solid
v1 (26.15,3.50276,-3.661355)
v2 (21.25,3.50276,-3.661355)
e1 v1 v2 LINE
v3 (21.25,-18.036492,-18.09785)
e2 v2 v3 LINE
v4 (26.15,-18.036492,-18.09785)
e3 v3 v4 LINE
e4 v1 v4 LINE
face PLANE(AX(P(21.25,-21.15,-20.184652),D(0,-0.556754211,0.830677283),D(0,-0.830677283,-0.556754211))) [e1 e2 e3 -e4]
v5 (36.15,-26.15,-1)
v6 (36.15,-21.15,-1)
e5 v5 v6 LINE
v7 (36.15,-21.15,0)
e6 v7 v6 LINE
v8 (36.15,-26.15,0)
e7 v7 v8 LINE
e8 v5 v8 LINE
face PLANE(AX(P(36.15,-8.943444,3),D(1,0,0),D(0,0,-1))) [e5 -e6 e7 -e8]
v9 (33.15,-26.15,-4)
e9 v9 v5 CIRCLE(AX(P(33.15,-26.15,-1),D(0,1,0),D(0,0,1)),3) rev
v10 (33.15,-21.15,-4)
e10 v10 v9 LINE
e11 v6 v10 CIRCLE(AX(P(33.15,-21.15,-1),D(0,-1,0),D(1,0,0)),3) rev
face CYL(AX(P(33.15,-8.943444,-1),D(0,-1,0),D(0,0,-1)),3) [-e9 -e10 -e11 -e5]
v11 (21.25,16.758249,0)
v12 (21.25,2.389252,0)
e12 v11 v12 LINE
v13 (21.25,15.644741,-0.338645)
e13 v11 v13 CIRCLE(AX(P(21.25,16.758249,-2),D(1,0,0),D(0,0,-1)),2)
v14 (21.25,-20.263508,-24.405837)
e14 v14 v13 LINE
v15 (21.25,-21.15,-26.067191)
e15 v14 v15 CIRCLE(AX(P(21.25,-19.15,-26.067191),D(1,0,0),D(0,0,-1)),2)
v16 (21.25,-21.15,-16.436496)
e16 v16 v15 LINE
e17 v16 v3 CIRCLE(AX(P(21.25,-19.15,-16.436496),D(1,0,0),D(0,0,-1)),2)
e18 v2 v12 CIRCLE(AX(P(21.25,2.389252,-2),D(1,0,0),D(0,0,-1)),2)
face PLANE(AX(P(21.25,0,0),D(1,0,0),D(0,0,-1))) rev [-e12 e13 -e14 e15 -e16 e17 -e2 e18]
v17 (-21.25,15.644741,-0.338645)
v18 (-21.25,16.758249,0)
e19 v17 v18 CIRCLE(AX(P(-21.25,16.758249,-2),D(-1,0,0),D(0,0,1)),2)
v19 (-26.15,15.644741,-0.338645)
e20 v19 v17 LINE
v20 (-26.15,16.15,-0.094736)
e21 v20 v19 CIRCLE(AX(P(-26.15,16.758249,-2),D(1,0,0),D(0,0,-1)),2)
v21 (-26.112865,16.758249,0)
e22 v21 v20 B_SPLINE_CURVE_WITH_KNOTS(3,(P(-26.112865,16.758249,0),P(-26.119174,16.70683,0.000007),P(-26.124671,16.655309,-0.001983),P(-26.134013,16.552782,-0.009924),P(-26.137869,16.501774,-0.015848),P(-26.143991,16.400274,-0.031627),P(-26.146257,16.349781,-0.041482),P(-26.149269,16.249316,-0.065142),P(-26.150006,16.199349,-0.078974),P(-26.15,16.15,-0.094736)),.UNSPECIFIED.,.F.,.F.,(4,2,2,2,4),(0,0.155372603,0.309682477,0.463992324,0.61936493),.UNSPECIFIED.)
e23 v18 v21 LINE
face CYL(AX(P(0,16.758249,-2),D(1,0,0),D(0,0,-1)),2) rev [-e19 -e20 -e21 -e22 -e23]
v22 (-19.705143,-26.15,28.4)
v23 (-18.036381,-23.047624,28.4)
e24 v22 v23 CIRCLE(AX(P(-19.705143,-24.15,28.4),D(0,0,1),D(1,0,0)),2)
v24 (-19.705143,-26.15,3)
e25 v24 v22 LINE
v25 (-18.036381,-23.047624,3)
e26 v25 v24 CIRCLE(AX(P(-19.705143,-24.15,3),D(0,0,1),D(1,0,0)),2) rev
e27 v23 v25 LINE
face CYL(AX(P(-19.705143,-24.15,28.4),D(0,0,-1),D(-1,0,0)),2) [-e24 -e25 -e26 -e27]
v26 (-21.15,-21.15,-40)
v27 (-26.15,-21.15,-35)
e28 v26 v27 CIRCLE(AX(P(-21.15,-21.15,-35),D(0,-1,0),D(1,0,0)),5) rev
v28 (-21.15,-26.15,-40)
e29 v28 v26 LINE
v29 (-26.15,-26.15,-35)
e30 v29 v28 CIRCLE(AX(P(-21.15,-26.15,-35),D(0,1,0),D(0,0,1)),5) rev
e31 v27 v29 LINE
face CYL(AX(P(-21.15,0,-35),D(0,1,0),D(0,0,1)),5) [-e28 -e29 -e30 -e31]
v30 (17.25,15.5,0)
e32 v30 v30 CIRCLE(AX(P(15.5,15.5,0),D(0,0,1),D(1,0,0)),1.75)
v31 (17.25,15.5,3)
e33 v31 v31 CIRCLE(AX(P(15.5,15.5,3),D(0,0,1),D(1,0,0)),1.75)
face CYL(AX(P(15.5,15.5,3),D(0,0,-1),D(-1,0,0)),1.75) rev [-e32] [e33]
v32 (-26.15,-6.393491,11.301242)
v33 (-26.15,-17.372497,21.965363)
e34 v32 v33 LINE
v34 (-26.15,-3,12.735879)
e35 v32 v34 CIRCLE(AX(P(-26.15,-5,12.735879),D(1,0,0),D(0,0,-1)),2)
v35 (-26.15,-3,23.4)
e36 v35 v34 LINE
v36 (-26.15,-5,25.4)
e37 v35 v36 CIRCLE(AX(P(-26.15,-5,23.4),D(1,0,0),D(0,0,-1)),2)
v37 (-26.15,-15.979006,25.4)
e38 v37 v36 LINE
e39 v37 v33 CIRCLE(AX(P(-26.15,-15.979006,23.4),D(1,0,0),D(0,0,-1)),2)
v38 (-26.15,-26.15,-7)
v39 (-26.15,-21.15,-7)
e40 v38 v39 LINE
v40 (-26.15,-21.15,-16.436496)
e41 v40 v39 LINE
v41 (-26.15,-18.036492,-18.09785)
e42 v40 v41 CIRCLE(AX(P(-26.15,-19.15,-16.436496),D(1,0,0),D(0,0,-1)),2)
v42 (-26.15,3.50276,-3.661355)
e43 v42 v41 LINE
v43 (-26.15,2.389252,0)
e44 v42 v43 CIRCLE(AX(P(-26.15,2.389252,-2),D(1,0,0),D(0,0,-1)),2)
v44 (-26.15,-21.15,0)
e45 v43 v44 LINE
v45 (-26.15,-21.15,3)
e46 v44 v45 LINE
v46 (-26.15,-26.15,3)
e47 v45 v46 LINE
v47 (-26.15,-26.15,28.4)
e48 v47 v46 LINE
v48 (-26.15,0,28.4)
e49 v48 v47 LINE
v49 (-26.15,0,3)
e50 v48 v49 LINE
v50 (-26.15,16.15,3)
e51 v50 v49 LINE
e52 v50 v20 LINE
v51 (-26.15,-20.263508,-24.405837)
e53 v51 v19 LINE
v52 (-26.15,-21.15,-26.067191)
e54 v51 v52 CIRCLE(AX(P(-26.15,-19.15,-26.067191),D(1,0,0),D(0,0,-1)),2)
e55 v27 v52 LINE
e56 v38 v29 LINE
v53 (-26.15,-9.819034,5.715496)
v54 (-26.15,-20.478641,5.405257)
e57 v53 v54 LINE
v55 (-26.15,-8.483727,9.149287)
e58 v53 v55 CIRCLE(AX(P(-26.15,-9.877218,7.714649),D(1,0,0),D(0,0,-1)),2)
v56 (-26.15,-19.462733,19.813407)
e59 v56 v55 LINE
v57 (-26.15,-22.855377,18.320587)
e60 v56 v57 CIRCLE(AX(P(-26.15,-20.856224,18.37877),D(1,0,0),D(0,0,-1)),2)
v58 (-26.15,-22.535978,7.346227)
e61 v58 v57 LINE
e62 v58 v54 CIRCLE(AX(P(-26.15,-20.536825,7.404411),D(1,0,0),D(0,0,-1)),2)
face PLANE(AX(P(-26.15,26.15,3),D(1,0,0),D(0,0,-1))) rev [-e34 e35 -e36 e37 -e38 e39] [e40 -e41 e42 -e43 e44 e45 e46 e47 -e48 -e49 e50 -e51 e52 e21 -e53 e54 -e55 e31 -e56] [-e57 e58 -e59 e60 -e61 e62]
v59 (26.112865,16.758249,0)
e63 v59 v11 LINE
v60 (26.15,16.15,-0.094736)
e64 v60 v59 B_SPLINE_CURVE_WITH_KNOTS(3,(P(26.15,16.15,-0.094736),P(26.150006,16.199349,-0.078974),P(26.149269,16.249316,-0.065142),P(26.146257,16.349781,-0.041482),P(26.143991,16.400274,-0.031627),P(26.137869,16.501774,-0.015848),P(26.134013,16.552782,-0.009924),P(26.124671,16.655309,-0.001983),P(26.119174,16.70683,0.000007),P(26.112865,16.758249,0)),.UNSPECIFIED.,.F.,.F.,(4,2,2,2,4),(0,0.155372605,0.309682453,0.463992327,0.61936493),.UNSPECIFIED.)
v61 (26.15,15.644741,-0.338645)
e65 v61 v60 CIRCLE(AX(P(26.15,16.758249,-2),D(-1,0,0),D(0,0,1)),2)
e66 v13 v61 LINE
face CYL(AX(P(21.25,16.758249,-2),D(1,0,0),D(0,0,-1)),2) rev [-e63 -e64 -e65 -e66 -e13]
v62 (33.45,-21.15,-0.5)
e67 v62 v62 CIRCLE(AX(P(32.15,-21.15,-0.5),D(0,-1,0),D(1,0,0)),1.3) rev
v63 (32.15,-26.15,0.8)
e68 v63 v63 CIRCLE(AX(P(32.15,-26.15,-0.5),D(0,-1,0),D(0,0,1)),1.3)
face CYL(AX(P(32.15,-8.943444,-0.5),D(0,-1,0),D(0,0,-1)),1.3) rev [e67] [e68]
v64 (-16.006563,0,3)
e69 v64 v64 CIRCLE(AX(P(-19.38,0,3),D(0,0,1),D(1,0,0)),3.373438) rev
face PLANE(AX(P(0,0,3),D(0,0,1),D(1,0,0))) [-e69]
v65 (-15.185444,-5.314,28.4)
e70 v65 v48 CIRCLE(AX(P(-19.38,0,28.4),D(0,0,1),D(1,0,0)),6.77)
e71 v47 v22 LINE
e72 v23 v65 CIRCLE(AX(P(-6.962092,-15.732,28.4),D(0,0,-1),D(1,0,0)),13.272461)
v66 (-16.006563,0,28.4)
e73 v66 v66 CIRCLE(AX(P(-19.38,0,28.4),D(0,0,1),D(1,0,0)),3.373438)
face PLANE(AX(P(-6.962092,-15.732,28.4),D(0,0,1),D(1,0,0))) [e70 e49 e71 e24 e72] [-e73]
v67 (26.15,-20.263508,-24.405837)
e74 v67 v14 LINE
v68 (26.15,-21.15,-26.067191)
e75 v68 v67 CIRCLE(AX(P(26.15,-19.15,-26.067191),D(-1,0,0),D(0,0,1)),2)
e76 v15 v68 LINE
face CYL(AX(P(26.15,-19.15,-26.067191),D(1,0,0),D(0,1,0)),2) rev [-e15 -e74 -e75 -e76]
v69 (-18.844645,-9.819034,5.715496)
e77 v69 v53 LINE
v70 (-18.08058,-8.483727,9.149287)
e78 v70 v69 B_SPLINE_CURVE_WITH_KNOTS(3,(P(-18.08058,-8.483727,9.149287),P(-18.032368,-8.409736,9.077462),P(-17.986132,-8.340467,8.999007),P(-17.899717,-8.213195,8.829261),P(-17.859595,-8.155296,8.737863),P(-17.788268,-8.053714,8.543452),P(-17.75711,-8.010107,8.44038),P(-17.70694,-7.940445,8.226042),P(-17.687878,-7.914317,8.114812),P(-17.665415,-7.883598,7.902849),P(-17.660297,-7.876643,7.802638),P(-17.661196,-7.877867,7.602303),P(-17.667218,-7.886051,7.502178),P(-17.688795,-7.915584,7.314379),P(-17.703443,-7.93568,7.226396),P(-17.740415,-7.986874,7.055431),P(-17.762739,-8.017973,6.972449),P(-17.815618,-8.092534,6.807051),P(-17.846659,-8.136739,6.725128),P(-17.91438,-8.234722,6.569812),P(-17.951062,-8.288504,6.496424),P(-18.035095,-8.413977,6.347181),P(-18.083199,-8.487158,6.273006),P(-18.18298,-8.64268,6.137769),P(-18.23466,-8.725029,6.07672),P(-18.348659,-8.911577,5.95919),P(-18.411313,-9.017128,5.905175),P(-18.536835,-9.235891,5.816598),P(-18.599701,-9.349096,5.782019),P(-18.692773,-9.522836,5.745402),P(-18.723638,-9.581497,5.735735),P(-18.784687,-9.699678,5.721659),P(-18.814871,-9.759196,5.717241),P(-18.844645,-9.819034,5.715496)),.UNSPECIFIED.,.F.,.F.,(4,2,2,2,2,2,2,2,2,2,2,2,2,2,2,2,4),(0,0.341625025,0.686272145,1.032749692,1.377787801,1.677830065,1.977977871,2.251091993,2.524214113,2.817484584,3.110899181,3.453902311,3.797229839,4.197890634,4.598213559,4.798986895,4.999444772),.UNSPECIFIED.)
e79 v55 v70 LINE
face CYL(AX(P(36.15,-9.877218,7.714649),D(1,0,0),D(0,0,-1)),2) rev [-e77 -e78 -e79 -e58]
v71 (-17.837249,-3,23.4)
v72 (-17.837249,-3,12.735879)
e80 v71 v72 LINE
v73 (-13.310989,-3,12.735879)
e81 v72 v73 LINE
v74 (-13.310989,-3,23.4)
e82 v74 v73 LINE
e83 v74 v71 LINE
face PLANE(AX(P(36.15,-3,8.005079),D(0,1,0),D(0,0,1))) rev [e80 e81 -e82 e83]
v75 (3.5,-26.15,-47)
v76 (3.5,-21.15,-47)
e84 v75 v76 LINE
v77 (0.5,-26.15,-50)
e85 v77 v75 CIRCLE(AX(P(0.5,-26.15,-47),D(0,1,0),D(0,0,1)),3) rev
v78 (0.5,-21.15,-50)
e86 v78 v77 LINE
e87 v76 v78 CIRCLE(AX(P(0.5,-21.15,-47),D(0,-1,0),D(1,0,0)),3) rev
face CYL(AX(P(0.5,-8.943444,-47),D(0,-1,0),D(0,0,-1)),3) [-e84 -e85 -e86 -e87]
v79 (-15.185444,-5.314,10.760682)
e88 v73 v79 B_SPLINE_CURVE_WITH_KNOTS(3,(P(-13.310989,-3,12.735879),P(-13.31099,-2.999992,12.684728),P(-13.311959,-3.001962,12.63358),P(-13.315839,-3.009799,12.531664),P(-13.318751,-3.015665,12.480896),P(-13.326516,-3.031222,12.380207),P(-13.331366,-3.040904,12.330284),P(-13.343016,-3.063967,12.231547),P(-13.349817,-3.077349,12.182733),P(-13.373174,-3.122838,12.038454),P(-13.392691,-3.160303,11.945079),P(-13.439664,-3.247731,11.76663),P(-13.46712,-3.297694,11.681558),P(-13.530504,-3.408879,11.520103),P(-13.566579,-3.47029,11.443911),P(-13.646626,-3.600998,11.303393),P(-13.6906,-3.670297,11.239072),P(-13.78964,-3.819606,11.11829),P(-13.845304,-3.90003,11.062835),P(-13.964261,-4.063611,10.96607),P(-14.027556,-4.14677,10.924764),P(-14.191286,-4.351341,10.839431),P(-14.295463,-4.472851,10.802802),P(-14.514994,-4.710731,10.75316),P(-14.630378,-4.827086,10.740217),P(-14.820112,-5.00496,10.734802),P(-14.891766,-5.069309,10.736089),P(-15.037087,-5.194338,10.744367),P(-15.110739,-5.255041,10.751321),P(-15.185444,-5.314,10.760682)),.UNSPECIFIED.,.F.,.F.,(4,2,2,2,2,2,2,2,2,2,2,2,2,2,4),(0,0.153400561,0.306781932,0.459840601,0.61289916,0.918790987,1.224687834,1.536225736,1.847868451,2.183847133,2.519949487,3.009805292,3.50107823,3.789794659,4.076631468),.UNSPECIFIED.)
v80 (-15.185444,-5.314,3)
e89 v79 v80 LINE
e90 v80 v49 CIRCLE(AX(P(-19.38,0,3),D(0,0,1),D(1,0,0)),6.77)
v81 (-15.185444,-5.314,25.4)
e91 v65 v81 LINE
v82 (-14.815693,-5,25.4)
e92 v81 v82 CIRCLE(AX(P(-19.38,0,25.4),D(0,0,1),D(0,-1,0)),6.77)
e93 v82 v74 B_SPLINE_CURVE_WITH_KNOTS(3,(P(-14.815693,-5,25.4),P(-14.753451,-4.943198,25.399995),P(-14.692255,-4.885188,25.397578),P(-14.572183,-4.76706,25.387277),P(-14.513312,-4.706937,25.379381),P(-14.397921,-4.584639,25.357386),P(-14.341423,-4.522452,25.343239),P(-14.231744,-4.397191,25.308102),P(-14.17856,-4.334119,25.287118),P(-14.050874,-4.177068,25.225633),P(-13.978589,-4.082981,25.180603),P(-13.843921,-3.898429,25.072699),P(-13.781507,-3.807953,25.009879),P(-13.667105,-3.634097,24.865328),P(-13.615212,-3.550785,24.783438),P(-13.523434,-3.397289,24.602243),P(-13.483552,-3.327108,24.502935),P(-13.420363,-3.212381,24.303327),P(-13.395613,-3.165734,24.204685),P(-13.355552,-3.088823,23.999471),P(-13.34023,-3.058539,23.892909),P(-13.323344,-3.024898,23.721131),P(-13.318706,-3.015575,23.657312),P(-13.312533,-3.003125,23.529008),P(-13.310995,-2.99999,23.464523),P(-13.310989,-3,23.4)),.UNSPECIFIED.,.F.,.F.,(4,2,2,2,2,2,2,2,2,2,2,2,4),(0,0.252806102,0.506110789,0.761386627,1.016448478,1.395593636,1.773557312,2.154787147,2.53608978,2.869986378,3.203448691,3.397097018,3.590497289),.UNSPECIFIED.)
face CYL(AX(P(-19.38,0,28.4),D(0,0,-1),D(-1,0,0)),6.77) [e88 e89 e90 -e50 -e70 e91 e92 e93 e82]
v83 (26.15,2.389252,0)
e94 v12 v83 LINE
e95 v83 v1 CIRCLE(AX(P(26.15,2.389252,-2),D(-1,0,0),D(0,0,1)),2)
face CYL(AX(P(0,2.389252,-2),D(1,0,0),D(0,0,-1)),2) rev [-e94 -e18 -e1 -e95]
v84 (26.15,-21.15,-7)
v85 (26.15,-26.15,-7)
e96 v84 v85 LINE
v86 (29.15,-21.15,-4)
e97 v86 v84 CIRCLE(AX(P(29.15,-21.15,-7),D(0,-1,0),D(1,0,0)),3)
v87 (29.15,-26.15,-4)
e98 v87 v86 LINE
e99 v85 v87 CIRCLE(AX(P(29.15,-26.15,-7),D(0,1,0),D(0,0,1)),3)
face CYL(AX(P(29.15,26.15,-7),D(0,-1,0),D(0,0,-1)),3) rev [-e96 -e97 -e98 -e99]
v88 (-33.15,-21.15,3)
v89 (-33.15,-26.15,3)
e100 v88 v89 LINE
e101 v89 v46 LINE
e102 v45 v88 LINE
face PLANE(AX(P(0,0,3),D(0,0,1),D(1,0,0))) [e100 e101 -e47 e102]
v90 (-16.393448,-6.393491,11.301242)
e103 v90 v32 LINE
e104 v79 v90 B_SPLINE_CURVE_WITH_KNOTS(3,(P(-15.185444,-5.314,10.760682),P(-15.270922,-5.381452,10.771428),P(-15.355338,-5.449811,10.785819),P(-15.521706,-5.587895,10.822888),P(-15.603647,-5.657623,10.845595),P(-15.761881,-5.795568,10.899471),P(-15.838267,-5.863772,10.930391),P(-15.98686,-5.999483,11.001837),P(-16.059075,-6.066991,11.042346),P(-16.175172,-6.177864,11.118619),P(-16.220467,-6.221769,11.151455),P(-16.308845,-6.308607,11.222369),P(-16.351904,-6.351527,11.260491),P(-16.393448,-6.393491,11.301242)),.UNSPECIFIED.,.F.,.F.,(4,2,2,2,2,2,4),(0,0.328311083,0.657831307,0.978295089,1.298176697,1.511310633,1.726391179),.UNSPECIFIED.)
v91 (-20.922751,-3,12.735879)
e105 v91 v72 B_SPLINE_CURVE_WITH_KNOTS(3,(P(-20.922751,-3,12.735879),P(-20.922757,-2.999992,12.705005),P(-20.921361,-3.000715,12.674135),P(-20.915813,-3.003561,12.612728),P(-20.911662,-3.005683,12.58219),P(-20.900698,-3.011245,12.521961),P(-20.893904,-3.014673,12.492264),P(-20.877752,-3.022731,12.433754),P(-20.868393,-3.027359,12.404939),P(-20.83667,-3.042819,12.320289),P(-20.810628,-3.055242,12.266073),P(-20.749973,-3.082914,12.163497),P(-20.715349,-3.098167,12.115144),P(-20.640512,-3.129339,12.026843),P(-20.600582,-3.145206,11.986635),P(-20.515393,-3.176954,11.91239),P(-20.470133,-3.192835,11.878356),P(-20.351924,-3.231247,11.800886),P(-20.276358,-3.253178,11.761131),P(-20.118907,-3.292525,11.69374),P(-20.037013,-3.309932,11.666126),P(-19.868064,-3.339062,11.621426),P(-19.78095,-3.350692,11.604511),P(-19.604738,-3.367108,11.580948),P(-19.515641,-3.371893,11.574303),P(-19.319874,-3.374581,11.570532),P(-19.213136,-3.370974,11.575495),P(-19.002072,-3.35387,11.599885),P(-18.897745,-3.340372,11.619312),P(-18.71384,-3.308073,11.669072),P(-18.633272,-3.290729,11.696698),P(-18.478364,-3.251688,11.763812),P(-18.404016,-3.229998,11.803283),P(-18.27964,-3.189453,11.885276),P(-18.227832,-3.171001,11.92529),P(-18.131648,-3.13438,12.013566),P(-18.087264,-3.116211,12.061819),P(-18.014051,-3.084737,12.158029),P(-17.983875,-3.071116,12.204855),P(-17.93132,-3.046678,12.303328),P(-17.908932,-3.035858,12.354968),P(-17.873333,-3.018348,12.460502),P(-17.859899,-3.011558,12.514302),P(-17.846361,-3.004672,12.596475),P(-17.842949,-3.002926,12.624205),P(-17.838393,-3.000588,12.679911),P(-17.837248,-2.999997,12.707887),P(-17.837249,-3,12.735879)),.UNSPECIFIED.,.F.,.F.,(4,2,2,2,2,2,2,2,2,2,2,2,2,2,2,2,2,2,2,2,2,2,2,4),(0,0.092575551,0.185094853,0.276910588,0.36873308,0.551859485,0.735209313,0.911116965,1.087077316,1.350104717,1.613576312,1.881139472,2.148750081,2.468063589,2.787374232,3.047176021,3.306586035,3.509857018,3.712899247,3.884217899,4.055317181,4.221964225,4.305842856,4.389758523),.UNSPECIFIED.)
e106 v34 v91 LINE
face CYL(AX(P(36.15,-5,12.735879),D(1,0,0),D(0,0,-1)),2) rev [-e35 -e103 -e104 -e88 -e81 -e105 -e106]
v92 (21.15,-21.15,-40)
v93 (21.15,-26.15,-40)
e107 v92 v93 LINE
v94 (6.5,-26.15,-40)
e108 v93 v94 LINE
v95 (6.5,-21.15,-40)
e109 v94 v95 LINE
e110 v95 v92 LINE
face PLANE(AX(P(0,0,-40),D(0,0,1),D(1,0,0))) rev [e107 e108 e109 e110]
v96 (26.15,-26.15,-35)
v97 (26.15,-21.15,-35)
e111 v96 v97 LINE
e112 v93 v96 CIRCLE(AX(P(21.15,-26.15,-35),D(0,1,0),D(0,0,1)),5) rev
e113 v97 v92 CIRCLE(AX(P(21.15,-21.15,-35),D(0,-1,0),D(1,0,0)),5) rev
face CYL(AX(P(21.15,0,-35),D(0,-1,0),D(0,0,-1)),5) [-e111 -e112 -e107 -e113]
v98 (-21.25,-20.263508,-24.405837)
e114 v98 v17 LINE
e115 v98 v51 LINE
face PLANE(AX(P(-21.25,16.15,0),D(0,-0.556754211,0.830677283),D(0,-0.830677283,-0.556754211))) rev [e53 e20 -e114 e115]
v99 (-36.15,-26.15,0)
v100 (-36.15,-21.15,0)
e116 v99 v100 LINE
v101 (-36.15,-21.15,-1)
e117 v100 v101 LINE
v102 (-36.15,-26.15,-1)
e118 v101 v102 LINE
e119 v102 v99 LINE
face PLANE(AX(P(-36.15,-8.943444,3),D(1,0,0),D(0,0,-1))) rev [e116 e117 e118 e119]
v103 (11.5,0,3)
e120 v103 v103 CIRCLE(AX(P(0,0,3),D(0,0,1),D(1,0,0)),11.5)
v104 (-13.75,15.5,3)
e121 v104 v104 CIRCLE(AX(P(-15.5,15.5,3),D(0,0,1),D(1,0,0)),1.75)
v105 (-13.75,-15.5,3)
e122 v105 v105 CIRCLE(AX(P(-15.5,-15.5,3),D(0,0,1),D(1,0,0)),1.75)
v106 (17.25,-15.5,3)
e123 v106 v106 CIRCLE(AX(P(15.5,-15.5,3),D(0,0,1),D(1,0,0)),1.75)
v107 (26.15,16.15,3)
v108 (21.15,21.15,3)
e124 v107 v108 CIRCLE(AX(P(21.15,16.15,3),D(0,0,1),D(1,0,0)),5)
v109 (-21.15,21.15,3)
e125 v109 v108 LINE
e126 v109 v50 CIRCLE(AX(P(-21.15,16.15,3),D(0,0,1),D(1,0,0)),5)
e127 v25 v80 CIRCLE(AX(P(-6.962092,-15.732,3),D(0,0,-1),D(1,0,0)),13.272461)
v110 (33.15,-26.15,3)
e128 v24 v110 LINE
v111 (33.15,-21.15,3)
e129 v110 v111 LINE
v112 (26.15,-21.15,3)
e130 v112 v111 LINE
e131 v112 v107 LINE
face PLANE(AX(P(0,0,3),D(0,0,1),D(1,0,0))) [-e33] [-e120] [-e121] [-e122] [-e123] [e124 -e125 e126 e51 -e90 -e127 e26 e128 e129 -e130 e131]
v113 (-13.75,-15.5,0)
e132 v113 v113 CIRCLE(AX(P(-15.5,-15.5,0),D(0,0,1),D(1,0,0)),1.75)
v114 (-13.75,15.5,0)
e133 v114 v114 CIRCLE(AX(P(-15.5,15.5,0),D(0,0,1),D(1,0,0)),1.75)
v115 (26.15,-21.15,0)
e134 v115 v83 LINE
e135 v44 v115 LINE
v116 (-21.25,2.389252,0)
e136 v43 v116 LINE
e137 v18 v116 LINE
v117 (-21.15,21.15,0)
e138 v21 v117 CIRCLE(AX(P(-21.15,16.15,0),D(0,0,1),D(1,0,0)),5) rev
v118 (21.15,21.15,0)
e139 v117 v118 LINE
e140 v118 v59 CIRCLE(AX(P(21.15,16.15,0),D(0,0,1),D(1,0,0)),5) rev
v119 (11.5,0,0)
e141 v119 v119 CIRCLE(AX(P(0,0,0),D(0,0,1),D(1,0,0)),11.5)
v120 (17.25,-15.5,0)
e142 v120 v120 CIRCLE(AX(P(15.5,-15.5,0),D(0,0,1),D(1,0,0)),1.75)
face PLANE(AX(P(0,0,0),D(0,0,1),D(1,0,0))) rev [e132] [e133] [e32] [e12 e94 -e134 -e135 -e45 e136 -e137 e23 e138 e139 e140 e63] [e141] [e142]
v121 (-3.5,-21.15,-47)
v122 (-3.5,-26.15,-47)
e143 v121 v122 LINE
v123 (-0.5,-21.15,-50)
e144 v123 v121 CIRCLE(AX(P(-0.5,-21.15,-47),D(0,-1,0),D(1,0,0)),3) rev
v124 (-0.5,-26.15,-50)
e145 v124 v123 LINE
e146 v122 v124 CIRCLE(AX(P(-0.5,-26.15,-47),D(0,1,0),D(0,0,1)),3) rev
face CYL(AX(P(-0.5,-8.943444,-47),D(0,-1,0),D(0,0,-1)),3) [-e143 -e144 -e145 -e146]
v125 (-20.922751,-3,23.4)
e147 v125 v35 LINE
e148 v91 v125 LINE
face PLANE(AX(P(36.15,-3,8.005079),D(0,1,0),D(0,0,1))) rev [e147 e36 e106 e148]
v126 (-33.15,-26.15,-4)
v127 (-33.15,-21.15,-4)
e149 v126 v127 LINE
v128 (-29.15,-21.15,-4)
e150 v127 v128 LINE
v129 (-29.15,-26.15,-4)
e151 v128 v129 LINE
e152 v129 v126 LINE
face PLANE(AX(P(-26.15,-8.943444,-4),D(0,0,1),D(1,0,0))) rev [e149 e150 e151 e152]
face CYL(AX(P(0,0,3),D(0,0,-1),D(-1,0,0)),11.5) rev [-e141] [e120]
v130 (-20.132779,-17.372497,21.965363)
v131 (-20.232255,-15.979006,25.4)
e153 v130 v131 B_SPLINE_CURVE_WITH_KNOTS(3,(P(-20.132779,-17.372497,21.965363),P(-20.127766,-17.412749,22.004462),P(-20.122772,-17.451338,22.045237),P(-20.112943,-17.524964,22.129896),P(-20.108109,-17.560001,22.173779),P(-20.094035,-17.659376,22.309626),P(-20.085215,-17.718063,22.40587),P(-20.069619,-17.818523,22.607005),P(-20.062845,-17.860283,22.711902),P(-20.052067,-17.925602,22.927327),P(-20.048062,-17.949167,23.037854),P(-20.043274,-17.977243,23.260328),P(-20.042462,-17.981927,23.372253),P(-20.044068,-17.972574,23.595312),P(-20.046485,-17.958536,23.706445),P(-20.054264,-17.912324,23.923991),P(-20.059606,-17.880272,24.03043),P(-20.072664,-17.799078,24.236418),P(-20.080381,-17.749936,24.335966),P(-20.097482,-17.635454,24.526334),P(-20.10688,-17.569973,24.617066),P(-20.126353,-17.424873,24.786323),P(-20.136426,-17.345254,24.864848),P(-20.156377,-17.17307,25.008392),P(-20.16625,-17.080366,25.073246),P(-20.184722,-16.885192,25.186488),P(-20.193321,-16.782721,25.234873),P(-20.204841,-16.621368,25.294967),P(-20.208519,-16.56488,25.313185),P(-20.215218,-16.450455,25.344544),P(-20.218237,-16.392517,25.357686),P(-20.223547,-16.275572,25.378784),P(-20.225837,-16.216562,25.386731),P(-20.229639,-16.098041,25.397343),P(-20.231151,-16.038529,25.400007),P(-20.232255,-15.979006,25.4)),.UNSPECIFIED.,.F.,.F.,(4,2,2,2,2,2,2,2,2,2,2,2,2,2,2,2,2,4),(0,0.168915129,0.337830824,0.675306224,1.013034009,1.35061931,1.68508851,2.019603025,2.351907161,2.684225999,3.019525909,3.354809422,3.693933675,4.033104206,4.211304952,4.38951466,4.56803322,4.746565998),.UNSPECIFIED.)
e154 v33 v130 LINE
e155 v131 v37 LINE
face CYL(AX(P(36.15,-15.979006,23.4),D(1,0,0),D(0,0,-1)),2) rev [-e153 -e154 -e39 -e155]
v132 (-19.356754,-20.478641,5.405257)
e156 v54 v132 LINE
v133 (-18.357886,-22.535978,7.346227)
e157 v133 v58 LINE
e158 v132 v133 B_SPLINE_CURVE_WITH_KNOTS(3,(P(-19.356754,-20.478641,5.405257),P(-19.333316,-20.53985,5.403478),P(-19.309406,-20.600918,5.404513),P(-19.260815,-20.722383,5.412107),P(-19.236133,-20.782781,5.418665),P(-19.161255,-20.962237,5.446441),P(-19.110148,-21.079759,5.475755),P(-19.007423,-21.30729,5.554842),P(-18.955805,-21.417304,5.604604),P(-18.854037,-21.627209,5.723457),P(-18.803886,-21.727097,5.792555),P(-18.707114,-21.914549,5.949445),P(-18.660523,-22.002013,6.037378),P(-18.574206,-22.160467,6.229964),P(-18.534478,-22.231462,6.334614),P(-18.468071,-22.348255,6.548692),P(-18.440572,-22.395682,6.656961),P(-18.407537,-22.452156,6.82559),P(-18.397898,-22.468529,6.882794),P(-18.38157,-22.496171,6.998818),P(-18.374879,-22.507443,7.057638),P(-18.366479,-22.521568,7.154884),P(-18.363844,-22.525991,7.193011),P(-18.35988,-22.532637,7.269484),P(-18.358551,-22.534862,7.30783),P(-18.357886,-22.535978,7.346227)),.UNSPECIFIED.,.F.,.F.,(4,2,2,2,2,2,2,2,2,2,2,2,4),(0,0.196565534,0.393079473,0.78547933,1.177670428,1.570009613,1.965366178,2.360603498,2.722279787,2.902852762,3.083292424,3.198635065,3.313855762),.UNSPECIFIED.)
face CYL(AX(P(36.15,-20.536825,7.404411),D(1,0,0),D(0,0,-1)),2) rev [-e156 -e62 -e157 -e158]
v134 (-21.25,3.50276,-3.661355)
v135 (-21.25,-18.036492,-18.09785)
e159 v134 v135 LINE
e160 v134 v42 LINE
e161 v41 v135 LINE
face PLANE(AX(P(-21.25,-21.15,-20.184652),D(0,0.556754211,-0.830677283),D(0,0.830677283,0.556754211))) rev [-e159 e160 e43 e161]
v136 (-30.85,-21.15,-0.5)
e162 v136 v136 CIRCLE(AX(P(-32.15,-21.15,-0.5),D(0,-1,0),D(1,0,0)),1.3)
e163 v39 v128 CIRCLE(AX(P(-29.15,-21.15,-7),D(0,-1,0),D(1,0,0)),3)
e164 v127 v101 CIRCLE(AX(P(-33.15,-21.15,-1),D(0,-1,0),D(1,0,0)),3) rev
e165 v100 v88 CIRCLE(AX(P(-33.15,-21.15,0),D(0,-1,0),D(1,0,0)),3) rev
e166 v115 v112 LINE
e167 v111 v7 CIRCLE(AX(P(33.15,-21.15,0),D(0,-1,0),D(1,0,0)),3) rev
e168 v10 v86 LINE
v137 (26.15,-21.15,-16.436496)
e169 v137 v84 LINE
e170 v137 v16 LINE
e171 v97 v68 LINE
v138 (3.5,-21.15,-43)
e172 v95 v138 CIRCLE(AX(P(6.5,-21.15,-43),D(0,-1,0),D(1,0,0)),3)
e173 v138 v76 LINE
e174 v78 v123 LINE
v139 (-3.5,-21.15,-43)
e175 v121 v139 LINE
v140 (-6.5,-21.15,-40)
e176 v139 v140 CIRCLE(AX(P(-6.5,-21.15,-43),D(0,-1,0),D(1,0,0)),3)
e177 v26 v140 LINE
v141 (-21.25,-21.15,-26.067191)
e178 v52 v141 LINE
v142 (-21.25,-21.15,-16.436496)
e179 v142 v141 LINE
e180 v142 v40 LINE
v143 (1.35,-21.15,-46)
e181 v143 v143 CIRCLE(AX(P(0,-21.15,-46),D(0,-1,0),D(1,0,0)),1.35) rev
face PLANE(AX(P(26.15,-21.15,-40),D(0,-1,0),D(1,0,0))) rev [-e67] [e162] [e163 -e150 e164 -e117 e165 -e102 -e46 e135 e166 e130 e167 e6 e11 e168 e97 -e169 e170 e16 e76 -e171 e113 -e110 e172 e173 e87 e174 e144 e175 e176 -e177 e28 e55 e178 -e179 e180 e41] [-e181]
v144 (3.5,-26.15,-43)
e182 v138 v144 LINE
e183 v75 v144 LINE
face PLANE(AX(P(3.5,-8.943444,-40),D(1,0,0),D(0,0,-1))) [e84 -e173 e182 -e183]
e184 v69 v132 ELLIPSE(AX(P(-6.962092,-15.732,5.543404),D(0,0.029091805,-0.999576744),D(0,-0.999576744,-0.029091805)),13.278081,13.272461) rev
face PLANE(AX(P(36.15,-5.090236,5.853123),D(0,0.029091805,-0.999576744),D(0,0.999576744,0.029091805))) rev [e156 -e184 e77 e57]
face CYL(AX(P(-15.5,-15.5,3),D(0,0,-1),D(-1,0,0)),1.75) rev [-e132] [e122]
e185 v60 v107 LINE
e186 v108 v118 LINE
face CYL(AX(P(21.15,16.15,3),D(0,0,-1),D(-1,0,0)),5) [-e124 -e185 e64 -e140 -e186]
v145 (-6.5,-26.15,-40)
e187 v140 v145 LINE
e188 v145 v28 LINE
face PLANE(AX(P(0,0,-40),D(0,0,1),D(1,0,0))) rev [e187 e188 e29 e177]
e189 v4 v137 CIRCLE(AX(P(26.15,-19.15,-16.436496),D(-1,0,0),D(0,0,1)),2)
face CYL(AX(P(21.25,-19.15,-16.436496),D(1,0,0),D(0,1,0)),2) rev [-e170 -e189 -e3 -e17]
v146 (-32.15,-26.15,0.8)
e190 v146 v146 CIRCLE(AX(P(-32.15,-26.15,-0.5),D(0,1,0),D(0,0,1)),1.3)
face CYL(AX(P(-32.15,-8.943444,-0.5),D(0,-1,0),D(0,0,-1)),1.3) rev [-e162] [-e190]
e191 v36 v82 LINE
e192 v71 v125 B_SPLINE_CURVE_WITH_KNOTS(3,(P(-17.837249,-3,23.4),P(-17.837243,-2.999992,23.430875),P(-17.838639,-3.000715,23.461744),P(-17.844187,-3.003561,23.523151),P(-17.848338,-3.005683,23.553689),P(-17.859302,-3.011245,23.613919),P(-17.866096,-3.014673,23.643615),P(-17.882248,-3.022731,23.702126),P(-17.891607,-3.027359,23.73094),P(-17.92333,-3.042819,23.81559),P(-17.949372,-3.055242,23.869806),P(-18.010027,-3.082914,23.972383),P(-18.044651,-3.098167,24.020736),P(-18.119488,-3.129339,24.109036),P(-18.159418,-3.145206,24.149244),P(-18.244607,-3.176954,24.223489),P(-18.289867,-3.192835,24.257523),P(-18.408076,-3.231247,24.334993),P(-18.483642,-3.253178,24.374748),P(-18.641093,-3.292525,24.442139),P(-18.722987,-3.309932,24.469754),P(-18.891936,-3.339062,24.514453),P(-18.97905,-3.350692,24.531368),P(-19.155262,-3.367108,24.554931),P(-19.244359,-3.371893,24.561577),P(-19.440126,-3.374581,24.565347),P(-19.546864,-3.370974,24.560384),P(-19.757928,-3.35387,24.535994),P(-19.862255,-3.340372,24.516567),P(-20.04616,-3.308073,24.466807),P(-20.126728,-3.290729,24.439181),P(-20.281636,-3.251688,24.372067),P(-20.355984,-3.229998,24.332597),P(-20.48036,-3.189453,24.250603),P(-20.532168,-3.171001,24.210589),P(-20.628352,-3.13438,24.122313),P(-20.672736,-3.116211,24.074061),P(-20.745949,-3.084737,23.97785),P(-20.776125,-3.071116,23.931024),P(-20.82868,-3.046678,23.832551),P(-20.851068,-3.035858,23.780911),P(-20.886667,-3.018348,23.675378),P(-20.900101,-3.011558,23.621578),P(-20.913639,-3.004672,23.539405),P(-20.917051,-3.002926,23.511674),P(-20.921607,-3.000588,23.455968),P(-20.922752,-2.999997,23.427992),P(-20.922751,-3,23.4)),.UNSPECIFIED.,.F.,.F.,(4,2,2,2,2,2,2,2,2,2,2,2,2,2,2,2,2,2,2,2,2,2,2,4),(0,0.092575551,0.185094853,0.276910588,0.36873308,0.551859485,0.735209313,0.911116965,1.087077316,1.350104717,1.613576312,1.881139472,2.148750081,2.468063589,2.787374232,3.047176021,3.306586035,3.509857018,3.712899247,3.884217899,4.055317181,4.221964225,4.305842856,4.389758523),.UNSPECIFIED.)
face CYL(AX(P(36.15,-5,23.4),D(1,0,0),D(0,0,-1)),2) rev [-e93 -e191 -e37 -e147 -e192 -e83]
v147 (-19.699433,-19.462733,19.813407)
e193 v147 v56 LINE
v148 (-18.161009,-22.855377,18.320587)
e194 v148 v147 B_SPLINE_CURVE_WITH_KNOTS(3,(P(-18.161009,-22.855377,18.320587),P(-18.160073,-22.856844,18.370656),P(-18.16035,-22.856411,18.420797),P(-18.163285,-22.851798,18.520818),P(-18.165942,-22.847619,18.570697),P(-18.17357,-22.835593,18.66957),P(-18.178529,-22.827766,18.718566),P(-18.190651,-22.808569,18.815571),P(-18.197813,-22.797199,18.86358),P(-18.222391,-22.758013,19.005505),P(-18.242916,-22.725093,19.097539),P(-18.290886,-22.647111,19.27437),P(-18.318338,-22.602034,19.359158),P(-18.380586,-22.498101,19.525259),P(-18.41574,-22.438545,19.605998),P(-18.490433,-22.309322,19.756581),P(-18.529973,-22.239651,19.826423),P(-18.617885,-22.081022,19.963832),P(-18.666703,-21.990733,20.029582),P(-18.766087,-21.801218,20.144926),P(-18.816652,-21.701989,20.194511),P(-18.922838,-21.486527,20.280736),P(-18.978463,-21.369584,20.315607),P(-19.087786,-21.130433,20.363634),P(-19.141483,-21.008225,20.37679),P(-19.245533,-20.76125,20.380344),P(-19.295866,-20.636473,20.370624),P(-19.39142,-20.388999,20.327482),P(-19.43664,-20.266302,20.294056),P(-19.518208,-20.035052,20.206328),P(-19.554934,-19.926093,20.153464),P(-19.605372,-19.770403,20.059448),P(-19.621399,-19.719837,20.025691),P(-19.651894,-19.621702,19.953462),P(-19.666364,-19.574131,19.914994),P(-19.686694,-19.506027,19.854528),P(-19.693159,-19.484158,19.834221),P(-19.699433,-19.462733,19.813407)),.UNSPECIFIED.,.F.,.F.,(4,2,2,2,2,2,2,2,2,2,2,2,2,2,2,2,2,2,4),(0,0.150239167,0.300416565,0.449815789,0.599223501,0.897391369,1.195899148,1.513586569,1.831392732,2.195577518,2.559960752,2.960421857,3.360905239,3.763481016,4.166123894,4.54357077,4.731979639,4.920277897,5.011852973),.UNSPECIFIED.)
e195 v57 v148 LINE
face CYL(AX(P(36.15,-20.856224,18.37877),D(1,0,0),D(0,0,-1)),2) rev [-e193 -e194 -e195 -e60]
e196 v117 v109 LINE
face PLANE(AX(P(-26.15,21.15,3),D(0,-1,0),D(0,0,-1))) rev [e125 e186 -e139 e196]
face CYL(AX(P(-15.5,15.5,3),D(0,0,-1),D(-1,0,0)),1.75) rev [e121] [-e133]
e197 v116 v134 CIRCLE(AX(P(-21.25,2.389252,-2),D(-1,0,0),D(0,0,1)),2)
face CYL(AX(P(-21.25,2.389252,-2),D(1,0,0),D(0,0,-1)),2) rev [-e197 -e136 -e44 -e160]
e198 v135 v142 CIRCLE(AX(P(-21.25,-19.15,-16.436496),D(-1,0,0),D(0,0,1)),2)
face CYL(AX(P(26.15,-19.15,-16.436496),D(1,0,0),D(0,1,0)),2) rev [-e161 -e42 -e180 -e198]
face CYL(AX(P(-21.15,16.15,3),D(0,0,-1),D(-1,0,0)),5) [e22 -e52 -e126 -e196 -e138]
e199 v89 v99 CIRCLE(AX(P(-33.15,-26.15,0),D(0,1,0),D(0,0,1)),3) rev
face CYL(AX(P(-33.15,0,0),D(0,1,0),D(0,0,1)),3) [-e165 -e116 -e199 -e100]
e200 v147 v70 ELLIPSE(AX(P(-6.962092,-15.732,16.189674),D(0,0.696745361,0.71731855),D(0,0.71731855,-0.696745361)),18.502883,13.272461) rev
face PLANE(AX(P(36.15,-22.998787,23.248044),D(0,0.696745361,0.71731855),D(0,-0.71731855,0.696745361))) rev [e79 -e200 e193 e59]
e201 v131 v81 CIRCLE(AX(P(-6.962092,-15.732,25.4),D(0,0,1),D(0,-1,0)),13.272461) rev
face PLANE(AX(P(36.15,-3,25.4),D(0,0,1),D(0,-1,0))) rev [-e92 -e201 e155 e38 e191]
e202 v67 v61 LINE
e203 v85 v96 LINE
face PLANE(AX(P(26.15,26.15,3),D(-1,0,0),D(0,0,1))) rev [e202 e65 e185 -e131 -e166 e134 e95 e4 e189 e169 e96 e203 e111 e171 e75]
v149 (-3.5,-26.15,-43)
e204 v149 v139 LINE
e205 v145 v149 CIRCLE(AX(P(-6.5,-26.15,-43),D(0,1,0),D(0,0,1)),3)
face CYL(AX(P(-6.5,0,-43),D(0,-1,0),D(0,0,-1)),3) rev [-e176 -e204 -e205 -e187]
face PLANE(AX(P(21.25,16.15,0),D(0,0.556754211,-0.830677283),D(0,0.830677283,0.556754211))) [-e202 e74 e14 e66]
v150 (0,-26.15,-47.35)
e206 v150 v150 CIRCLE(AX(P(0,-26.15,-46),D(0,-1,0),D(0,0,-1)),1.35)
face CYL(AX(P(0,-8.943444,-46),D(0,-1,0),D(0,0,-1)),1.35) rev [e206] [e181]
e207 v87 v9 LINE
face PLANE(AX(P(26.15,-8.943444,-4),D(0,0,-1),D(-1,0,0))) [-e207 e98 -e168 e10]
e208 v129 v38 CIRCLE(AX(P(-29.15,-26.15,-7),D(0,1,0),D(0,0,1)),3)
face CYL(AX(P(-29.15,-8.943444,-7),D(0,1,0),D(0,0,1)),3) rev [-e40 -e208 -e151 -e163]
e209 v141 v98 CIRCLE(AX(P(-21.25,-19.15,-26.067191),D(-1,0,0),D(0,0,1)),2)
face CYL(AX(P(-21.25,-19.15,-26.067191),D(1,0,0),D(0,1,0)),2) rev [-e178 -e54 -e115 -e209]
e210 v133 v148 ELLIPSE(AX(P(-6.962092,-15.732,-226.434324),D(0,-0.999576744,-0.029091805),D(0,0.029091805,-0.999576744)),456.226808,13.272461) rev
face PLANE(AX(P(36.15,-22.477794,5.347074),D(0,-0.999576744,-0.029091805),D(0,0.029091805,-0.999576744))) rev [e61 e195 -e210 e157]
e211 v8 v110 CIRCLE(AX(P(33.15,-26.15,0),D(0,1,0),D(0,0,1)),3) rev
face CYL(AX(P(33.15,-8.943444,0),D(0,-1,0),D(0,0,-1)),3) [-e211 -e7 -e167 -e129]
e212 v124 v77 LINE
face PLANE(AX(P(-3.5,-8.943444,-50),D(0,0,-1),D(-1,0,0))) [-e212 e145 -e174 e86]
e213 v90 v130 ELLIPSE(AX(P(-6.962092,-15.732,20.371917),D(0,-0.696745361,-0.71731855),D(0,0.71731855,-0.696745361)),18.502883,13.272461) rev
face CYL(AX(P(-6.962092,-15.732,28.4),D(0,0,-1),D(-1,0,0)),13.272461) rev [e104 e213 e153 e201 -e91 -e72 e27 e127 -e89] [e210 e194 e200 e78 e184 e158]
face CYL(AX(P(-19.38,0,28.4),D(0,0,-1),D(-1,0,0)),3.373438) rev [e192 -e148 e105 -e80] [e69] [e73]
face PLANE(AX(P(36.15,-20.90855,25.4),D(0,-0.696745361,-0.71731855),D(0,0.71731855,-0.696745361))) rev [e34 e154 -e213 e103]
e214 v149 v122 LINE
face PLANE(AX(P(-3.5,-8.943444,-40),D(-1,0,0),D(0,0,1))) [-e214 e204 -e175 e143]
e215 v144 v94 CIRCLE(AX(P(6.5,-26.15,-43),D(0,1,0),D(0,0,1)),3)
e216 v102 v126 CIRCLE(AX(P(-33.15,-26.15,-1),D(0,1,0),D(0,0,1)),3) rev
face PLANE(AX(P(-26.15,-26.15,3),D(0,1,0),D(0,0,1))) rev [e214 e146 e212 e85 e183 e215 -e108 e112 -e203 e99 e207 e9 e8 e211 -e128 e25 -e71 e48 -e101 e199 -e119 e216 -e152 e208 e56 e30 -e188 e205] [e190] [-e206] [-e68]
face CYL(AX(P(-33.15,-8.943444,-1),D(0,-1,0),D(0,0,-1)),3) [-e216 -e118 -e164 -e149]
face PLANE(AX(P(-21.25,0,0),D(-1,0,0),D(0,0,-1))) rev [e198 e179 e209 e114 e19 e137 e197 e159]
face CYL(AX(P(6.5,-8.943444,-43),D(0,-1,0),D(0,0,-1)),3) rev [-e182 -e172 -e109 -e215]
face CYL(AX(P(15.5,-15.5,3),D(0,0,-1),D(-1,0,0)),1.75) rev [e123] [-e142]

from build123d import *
from build123d.topology import SkipClean

# Parameters (mm, degrees)
SKETCH1_W           = 52.3
SKETCH1_H           = 52.3
SKETCH1_R           = 11.5
SKETCH1_R_2         = 1.75
BOSS_EXTRUDE1_DEPTH = 3
SKETCH2_W           = 52.3
SKETCH2_H           = 5
BOSS_EXTRUDE2_DEPTH = 40
SKETCH3_W           = 3
SKETCH3_H           = 5
CUT_EXTRUDE1_DEPTH  = 71.845695
BOSS_EXTRUDE3_DEPTH = 4.9
FILLET1_R           = 5
FILLET2_R           = 2
SKETCH5_W           = 10
SKETCH5_H           = 7
SKETCH5_R           = 1.3
BOSS_EXTRUDE4_DEPTH = 5
SKETCH6_W           = 7
SKETCH6_H           = 10
SKETCH6_R           = 1.35
BOSS_EXTRUDE5_DEPTH = 5
FILLET3_R           = 3
FILLET4_R           = 3
SKETCH7_R           = 3.3734375
BOSS_EXTRUDE6_DEPTH = 25.4
FILLET5_R           = 2
CUT_EXTRUDE2_DEPTH  = 85.05422357
FILLET6_START       = -26.15
FILLET6_DEPTH       = 7.129662431
FILLET6_START_2     = -20.042964894
FILLET6_2_DEPTH     = 4.85752147
FILLET6_START_3     = -16.0065624
FILLET6_3_DEPTH     = 2.695573852
FILLET6_4_DEPTH     = 1.974476163
FILLET6_5_DEPTH     = 1.685079156
FILLET6_START_4     = 2.9999999
FILLET6_6_DEPTH     = 22.4000001
FILLET6_START_5     = 5.780256625
FILLET6_7_DEPTH     = 0.960746932


with BuildPart() as part:
    # Sketch1 → Boss-Extrude1 (new body)
    with BuildSketch(Plane.XY):
        Rectangle(SKETCH1_W, SKETCH1_H)
        Circle(SKETCH1_R, mode=Mode.SUBTRACT)
        with Locations((-15.5, 15.5)):
            Circle(SKETCH1_R_2, mode=Mode.SUBTRACT)
        with Locations((15.5, 15.5)):
            Circle(SKETCH1_R_2, mode=Mode.SUBTRACT)
        with Locations((-15.5, -15.5)):
            Circle(SKETCH1_R_2, mode=Mode.SUBTRACT)
        with Locations((15.5, -15.5)):
            Circle(SKETCH1_R_2, mode=Mode.SUBTRACT)
    extrude(amount=BOSS_EXTRUDE1_DEPTH)

    # Sketch2 → Boss-Extrude2 (add)
    with BuildSketch(Plane(origin=(0, 0, 0), x_dir=(-1, 0, 0), z_dir=(0, 0, -1))):
        with Locations((0, -23.65)):
            Rectangle(SKETCH2_W, SKETCH2_H)
    extrude(amount=BOSS_EXTRUDE2_DEPTH)

    # Sketch3 → Cut-Extrude1 (cut, through all)
    with BuildSketch(Plane(origin=(26.15, 0, 0), x_dir=(0, 0, -1), z_dir=(1, 0, 0))):
        with Locations((-1.5, 23.65)):
            Rectangle(SKETCH3_W, SKETCH3_H)
    extrude(amount=-CUT_EXTRUDE1_DEPTH, mode=Mode.SUBTRACT)

    # Sketch4 → Boss-Extrude3 (add)
    with BuildSketch(Plane(origin=(26.15, 0, 0), x_dir=(0, 0, -1), z_dir=(1, 0, 0))):
        Polygon((0, 16.15), (25, -21.15), (20.184652233, -21.15), (0, 8.965501131), align=None)
    boss_extrude3 = extrude(amount=-BOSS_EXTRUDE3_DEPTH)

    # Mirror1: Boss-Extrude3 across plane
    add(boss_extrude3.mirror(Plane(origin=(0, 0, 0), x_dir=(0, 0, 1), z_dir=(1, 0, 0))))

    # Fillet1
    fillet1_edges = [part.edges().sort_by_distance(p)[0] for p in [
        (-26.15, -23.65, -40),
        (26.15, -23.65, -40),
        (-26.15, 21.15, 1.5),
        (26.15, 21.15, 1.5),
    ]]
    fillet(fillet1_edges, radius=FILLET1_R)

    # Fillet2
    fillet2_edges = [part.edges().sort_by_distance(p)[0] for p in [
        (23.7, 8.965501131, 0),
        (23.7, 16.15, 0),
        (23.7, -21.15, -25),
        (23.7, -21.15, -20.184652233),
        (-23.7, 16.15, 0),
        (-23.7, 8.965501131, 0),
        (-23.7, -21.15, -20.184652233),
        (-23.7, -21.15, -25),
    ]]
    fillet(fillet2_edges, radius=FILLET2_R)

    # Sketch5 → Boss-Extrude4 (add)
    with BuildSketch(Plane(origin=(0, -26.15, 0), x_dir=(1, 0, 0), z_dir=(0, 1, 0))):
        with Locations((-31.15, 0.5)):
            Rectangle(SKETCH5_W, SKETCH5_H)
        with Locations((-32.15, 0.5)):
            Circle(SKETCH5_R, mode=Mode.SUBTRACT)
    boss_extrude4 = extrude(amount=BOSS_EXTRUDE4_DEPTH)

    # Mirror2: Boss-Extrude4 across plane
    add(boss_extrude4.mirror(Plane(origin=(0, 0, 0), x_dir=(0, 0, 1), z_dir=(1, 0, 0))))

    # Sketch6 → Boss-Extrude5 (add)
    with BuildSketch(Plane.XZ.offset(26.15)):
        with Locations((0, -45)):
            Rectangle(SKETCH6_W, SKETCH6_H)
        with Locations(Location((0, -46, 0), (0, 0, 270))):
            Circle(SKETCH6_R, mode=Mode.SUBTRACT)
    extrude(amount=-BOSS_EXTRUDE5_DEPTH)

    # Fillet3
    fillet3_edges = [part.edges().sort_by_distance(p)[0] for p in [
        (-26.15, -23.65, -4),
        (-36.15, -23.65, -4),
        (-36.15, -23.65, 3),
        (36.15, -23.65, -4),
        (36.15, -23.65, 3),
        (26.15, -23.65, -4),
    ]]
    fillet(fillet3_edges, radius=FILLET3_R)

    # Fillet4
    fillet4_edges = [part.edges().sort_by_distance(p)[0] for p in [
        (3.5, -23.65, -50),
        (3.5, -23.65, -40),
        (-3.5, -23.65, -40),
        (-3.5, -23.65, -50),
    ]]
    fillet(fillet4_edges, radius=FILLET4_R)

    # Sketch7 → Boss-Extrude6 (add)
    with BuildSketch(Plane.XY.offset(3)):
        with BuildLine():
            Line((-26.15, 0), (-26.15, -26.15))
            Line((-26.15, -26.15), (-15.185443524, -26.15))
            ThreePointArc((-15.185443524, -26.15), (-20.234553545, -15.731999999), (-15.185443524, -5.313999997))
            ThreePointArc((-15.185443524, -5.313999997), (-16.427394993, 6.092210081), (-26.15, 0))
        make_face()
        with Locations((-19.38, 0)):
            Circle(SKETCH7_R, mode=Mode.SUBTRACT)
    extrude(amount=BOSS_EXTRUDE6_DEPTH)

    # Fillet5
    fillet5_edges = [part.edges().sort_by_distance(p)[0] for p in [
        (-15.185443524, -26.15, 15.7),
    ]]
    fillet(fillet5_edges, radius=FILLET5_R)

    # Sketch8 → Cut-Extrude2 (cut, through all)
    with BuildSketch(Plane.ZY.offset(26.15)):
        Polygon((8.005079096, -3), (25.4, -3), (25.4, -20.908550458), align=None)
        Polygon((5.347073795, -22.477794478), (23.248044349, -22.998786539), (5.853123446, -5.090236082), align=None)
    extrude(amount=-CUT_EXTRUDE2_DEPTH, mode=Mode.SUBTRACT)

    # Fillet6: read off the stored shape, not the designer's step
    # Fillet6 outline → Fillet6 (add)
    with BuildSketch(Plane.YZ.offset(FILLET6_START)):
        with BuildLine():
            ThreePointArc((-3, 12.735879268), (-4.221212944, 10.893736299), (-6.393490721, 11.301242168))
            Line((-6.393490721, 11.301242168), (-3, 8.005079096))
            Line((-3, 8.005079096), (-3, 12.735879268))
        make_face()
        with BuildLine():
            Line((-20.908550458, 25.4), (-17.372496907, 21.965362899))
            ThreePointArc((-17.372496907, 21.965362899), (-17.832283581, 24.151906177), (-15.979006186, 25.4))
            Line((-15.979006186, 25.4), (-20.908550458, 25.4))
        make_face()
        with BuildLine():
            ThreePointArc((-5, 25.4), (-3.585786438, 24.814213562), (-3, 23.4))
            Line((-3, 23.4), (-3, 25.4))
            Line((-3, 25.4), (-5, 25.4))
        make_face()
        with BuildLine():
            ThreePointArc((-22.855377198, 18.320586538), (-21.661726823, 20.209388823), (-19.462732989, 19.813407249))
            Line((-19.462732989, 19.813407249), (-22.998786539, 23.248044349))
            Line((-22.998786539, 23.248044349), (-22.855377198, 18.320586538))
        make_face()
        with BuildLine():
            Line((-5.090236082, 5.853123446), (-8.483726803, 9.149286517))
            ThreePointArc((-8.483726803, 9.149286517), (-8.013197931, 6.989783251), (-9.819033913, 5.715495928))
            Line((-9.819033913, 5.715495928), (-5.090236082, 5.853123446))
        make_face()
        with BuildLine():
            ThreePointArc((-20.47864099, 5.405257406), (-21.909297563, 5.94965388), (-22.535978089, 7.346227283))
            Line((-22.535978089, 7.346227283), (-22.477794478, 5.347073795))
            Line((-22.477794478, 5.347073795), (-20.47864099, 5.405257406))
        make_face()
    extrude(amount=FILLET6_DEPTH)

    # Fillet6 2 outline → Fillet6 2 (add)
    with BuildSketch(Plane.YZ.offset(FILLET6_START_2)):
        with BuildLine():
            ThreePointArc((-3, 12.735879268), (-4.221212944, 10.893736299), (-6.393490721, 11.301242168))
            Line((-6.393490721, 11.301242168), (-3, 8.005079096))
            Line((-3, 8.005079096), (-3, 12.735879268))
        make_face()
        with BuildLine():
            ThreePointArc((-5, 25.4), (-3.585786438, 24.814213562), (-3, 23.4))
            Line((-3, 23.4), (-3, 25.4))
            Line((-3, 25.4), (-5, 25.4))
        make_face()
        with BuildLine():
            Line((-5.090236082, 5.853123446), (-8.483726803, 9.149286517))
            ThreePointArc((-8.483726803, 9.149286517), (-8.013197931, 6.989783251), (-9.819033913, 5.715495928))
            Line((-9.819033913, 5.715495928), (-5.090236082, 5.853123446))
        make_face()
    extrude(amount=FILLET6_2_DEPTH)

    # Fillet6 3 outline → Fillet6 3 (add)
    with BuildSketch(Plane.YZ.offset(FILLET6_START_3)):
        with BuildLine():
            ThreePointArc((-3, 12.735879268), (-4.221212944, 10.893736299), (-6.393490721, 11.301242168))
            Line((-6.393490721, 11.301242168), (-3, 8.005079096))
            Line((-3, 8.005079096), (-3, 12.735879268))
        make_face()
        with BuildLine():
            ThreePointArc((-5, 25.4), (-3.585786438, 24.814213562), (-3, 23.4))
            Line((-3, 23.4), (-3, 25.4))
            Line((-3, 25.4), (-5, 25.4))
        make_face()
    extrude(amount=FILLET6_3_DEPTH)

    # Fillet6 4 outline → Fillet6 4 (add)
    with BuildSketch(Plane.YZ.offset(FILLET6_START_2)):
        with BuildLine():
            ThreePointArc((-22.855377198, 18.320586538), (-21.661726823, 20.209388823), (-19.462732989, 19.813407249))
            Line((-19.462732989, 19.813407249), (-22.998786539, 23.248044349))
            Line((-22.998786539, 23.248044349), (-22.855377198, 18.320586538))
        make_face()
    extrude(amount=FILLET6_4_DEPTH)

    # Fillet6 5 outline → Fillet6 5 (add)
    with BuildSketch(Plane.YZ.offset(FILLET6_START_2)):
        with BuildLine():
            ThreePointArc((-20.47864099, 5.405257406), (-21.909297563, 5.94965388), (-22.535978089, 7.346227283))
            Line((-22.535978089, 7.346227283), (-22.477794478, 5.347073795))
            Line((-22.477794478, 5.347073795), (-20.47864099, 5.405257406))
        make_face()
    extrude(amount=FILLET6_5_DEPTH)

    # Fillet6 6 outline → Fillet6 6 (cut)
    with SkipClean():  # the faces are left unmerged after this step: merging them gives an invalid solid
        with BuildSketch(Plane.XY.offset(FILLET6_START_4)):
            with BuildLine():
                Line((-18.03638138, -23.047623669), (-17.407246032, -24))
                Line((-17.407246032, -24), (-13.310988548, -24))
                Line((-13.310988548, -24), (-13.310988548, -3))
                ThreePointArc((-13.310988548, -3), (-14.11940539, -4.261343022), (-15.185443524, -5.313999997))
                ThreePointArc((-15.185443524, -5.313999997), (-20.066293198, -13.625309136), (-18.03638138, -23.047623669))
            make_face()
            with BuildLine():
                Line((-17.837249026, -3), (-20.922750974, -3))
                ThreePointArc((-20.922750974, -3), (-19.38, -3.3734375), (-17.837249026, -3))
            make_face()
        extrude(amount=FILLET6_6_DEPTH, mode=Mode.SUBTRACT)

    # Fillet6 7 outline → Fillet6 7 (add)
    with BuildSketch(Plane.XY.offset(FILLET6_START_5)):
        with BuildLine():
            Line((-15.185443424, -1), (-15.185443524, -5.313999997))
            ThreePointArc((-15.185443524, -5.313999997), (-13.523185641, -3.395677481), (-12.68426255, -1))
            Line((-12.68426255, -1), (-15.185443424, -1))
        make_face()
    extrude(amount=FILLET6_7_DEPTH)


solid = part.part
